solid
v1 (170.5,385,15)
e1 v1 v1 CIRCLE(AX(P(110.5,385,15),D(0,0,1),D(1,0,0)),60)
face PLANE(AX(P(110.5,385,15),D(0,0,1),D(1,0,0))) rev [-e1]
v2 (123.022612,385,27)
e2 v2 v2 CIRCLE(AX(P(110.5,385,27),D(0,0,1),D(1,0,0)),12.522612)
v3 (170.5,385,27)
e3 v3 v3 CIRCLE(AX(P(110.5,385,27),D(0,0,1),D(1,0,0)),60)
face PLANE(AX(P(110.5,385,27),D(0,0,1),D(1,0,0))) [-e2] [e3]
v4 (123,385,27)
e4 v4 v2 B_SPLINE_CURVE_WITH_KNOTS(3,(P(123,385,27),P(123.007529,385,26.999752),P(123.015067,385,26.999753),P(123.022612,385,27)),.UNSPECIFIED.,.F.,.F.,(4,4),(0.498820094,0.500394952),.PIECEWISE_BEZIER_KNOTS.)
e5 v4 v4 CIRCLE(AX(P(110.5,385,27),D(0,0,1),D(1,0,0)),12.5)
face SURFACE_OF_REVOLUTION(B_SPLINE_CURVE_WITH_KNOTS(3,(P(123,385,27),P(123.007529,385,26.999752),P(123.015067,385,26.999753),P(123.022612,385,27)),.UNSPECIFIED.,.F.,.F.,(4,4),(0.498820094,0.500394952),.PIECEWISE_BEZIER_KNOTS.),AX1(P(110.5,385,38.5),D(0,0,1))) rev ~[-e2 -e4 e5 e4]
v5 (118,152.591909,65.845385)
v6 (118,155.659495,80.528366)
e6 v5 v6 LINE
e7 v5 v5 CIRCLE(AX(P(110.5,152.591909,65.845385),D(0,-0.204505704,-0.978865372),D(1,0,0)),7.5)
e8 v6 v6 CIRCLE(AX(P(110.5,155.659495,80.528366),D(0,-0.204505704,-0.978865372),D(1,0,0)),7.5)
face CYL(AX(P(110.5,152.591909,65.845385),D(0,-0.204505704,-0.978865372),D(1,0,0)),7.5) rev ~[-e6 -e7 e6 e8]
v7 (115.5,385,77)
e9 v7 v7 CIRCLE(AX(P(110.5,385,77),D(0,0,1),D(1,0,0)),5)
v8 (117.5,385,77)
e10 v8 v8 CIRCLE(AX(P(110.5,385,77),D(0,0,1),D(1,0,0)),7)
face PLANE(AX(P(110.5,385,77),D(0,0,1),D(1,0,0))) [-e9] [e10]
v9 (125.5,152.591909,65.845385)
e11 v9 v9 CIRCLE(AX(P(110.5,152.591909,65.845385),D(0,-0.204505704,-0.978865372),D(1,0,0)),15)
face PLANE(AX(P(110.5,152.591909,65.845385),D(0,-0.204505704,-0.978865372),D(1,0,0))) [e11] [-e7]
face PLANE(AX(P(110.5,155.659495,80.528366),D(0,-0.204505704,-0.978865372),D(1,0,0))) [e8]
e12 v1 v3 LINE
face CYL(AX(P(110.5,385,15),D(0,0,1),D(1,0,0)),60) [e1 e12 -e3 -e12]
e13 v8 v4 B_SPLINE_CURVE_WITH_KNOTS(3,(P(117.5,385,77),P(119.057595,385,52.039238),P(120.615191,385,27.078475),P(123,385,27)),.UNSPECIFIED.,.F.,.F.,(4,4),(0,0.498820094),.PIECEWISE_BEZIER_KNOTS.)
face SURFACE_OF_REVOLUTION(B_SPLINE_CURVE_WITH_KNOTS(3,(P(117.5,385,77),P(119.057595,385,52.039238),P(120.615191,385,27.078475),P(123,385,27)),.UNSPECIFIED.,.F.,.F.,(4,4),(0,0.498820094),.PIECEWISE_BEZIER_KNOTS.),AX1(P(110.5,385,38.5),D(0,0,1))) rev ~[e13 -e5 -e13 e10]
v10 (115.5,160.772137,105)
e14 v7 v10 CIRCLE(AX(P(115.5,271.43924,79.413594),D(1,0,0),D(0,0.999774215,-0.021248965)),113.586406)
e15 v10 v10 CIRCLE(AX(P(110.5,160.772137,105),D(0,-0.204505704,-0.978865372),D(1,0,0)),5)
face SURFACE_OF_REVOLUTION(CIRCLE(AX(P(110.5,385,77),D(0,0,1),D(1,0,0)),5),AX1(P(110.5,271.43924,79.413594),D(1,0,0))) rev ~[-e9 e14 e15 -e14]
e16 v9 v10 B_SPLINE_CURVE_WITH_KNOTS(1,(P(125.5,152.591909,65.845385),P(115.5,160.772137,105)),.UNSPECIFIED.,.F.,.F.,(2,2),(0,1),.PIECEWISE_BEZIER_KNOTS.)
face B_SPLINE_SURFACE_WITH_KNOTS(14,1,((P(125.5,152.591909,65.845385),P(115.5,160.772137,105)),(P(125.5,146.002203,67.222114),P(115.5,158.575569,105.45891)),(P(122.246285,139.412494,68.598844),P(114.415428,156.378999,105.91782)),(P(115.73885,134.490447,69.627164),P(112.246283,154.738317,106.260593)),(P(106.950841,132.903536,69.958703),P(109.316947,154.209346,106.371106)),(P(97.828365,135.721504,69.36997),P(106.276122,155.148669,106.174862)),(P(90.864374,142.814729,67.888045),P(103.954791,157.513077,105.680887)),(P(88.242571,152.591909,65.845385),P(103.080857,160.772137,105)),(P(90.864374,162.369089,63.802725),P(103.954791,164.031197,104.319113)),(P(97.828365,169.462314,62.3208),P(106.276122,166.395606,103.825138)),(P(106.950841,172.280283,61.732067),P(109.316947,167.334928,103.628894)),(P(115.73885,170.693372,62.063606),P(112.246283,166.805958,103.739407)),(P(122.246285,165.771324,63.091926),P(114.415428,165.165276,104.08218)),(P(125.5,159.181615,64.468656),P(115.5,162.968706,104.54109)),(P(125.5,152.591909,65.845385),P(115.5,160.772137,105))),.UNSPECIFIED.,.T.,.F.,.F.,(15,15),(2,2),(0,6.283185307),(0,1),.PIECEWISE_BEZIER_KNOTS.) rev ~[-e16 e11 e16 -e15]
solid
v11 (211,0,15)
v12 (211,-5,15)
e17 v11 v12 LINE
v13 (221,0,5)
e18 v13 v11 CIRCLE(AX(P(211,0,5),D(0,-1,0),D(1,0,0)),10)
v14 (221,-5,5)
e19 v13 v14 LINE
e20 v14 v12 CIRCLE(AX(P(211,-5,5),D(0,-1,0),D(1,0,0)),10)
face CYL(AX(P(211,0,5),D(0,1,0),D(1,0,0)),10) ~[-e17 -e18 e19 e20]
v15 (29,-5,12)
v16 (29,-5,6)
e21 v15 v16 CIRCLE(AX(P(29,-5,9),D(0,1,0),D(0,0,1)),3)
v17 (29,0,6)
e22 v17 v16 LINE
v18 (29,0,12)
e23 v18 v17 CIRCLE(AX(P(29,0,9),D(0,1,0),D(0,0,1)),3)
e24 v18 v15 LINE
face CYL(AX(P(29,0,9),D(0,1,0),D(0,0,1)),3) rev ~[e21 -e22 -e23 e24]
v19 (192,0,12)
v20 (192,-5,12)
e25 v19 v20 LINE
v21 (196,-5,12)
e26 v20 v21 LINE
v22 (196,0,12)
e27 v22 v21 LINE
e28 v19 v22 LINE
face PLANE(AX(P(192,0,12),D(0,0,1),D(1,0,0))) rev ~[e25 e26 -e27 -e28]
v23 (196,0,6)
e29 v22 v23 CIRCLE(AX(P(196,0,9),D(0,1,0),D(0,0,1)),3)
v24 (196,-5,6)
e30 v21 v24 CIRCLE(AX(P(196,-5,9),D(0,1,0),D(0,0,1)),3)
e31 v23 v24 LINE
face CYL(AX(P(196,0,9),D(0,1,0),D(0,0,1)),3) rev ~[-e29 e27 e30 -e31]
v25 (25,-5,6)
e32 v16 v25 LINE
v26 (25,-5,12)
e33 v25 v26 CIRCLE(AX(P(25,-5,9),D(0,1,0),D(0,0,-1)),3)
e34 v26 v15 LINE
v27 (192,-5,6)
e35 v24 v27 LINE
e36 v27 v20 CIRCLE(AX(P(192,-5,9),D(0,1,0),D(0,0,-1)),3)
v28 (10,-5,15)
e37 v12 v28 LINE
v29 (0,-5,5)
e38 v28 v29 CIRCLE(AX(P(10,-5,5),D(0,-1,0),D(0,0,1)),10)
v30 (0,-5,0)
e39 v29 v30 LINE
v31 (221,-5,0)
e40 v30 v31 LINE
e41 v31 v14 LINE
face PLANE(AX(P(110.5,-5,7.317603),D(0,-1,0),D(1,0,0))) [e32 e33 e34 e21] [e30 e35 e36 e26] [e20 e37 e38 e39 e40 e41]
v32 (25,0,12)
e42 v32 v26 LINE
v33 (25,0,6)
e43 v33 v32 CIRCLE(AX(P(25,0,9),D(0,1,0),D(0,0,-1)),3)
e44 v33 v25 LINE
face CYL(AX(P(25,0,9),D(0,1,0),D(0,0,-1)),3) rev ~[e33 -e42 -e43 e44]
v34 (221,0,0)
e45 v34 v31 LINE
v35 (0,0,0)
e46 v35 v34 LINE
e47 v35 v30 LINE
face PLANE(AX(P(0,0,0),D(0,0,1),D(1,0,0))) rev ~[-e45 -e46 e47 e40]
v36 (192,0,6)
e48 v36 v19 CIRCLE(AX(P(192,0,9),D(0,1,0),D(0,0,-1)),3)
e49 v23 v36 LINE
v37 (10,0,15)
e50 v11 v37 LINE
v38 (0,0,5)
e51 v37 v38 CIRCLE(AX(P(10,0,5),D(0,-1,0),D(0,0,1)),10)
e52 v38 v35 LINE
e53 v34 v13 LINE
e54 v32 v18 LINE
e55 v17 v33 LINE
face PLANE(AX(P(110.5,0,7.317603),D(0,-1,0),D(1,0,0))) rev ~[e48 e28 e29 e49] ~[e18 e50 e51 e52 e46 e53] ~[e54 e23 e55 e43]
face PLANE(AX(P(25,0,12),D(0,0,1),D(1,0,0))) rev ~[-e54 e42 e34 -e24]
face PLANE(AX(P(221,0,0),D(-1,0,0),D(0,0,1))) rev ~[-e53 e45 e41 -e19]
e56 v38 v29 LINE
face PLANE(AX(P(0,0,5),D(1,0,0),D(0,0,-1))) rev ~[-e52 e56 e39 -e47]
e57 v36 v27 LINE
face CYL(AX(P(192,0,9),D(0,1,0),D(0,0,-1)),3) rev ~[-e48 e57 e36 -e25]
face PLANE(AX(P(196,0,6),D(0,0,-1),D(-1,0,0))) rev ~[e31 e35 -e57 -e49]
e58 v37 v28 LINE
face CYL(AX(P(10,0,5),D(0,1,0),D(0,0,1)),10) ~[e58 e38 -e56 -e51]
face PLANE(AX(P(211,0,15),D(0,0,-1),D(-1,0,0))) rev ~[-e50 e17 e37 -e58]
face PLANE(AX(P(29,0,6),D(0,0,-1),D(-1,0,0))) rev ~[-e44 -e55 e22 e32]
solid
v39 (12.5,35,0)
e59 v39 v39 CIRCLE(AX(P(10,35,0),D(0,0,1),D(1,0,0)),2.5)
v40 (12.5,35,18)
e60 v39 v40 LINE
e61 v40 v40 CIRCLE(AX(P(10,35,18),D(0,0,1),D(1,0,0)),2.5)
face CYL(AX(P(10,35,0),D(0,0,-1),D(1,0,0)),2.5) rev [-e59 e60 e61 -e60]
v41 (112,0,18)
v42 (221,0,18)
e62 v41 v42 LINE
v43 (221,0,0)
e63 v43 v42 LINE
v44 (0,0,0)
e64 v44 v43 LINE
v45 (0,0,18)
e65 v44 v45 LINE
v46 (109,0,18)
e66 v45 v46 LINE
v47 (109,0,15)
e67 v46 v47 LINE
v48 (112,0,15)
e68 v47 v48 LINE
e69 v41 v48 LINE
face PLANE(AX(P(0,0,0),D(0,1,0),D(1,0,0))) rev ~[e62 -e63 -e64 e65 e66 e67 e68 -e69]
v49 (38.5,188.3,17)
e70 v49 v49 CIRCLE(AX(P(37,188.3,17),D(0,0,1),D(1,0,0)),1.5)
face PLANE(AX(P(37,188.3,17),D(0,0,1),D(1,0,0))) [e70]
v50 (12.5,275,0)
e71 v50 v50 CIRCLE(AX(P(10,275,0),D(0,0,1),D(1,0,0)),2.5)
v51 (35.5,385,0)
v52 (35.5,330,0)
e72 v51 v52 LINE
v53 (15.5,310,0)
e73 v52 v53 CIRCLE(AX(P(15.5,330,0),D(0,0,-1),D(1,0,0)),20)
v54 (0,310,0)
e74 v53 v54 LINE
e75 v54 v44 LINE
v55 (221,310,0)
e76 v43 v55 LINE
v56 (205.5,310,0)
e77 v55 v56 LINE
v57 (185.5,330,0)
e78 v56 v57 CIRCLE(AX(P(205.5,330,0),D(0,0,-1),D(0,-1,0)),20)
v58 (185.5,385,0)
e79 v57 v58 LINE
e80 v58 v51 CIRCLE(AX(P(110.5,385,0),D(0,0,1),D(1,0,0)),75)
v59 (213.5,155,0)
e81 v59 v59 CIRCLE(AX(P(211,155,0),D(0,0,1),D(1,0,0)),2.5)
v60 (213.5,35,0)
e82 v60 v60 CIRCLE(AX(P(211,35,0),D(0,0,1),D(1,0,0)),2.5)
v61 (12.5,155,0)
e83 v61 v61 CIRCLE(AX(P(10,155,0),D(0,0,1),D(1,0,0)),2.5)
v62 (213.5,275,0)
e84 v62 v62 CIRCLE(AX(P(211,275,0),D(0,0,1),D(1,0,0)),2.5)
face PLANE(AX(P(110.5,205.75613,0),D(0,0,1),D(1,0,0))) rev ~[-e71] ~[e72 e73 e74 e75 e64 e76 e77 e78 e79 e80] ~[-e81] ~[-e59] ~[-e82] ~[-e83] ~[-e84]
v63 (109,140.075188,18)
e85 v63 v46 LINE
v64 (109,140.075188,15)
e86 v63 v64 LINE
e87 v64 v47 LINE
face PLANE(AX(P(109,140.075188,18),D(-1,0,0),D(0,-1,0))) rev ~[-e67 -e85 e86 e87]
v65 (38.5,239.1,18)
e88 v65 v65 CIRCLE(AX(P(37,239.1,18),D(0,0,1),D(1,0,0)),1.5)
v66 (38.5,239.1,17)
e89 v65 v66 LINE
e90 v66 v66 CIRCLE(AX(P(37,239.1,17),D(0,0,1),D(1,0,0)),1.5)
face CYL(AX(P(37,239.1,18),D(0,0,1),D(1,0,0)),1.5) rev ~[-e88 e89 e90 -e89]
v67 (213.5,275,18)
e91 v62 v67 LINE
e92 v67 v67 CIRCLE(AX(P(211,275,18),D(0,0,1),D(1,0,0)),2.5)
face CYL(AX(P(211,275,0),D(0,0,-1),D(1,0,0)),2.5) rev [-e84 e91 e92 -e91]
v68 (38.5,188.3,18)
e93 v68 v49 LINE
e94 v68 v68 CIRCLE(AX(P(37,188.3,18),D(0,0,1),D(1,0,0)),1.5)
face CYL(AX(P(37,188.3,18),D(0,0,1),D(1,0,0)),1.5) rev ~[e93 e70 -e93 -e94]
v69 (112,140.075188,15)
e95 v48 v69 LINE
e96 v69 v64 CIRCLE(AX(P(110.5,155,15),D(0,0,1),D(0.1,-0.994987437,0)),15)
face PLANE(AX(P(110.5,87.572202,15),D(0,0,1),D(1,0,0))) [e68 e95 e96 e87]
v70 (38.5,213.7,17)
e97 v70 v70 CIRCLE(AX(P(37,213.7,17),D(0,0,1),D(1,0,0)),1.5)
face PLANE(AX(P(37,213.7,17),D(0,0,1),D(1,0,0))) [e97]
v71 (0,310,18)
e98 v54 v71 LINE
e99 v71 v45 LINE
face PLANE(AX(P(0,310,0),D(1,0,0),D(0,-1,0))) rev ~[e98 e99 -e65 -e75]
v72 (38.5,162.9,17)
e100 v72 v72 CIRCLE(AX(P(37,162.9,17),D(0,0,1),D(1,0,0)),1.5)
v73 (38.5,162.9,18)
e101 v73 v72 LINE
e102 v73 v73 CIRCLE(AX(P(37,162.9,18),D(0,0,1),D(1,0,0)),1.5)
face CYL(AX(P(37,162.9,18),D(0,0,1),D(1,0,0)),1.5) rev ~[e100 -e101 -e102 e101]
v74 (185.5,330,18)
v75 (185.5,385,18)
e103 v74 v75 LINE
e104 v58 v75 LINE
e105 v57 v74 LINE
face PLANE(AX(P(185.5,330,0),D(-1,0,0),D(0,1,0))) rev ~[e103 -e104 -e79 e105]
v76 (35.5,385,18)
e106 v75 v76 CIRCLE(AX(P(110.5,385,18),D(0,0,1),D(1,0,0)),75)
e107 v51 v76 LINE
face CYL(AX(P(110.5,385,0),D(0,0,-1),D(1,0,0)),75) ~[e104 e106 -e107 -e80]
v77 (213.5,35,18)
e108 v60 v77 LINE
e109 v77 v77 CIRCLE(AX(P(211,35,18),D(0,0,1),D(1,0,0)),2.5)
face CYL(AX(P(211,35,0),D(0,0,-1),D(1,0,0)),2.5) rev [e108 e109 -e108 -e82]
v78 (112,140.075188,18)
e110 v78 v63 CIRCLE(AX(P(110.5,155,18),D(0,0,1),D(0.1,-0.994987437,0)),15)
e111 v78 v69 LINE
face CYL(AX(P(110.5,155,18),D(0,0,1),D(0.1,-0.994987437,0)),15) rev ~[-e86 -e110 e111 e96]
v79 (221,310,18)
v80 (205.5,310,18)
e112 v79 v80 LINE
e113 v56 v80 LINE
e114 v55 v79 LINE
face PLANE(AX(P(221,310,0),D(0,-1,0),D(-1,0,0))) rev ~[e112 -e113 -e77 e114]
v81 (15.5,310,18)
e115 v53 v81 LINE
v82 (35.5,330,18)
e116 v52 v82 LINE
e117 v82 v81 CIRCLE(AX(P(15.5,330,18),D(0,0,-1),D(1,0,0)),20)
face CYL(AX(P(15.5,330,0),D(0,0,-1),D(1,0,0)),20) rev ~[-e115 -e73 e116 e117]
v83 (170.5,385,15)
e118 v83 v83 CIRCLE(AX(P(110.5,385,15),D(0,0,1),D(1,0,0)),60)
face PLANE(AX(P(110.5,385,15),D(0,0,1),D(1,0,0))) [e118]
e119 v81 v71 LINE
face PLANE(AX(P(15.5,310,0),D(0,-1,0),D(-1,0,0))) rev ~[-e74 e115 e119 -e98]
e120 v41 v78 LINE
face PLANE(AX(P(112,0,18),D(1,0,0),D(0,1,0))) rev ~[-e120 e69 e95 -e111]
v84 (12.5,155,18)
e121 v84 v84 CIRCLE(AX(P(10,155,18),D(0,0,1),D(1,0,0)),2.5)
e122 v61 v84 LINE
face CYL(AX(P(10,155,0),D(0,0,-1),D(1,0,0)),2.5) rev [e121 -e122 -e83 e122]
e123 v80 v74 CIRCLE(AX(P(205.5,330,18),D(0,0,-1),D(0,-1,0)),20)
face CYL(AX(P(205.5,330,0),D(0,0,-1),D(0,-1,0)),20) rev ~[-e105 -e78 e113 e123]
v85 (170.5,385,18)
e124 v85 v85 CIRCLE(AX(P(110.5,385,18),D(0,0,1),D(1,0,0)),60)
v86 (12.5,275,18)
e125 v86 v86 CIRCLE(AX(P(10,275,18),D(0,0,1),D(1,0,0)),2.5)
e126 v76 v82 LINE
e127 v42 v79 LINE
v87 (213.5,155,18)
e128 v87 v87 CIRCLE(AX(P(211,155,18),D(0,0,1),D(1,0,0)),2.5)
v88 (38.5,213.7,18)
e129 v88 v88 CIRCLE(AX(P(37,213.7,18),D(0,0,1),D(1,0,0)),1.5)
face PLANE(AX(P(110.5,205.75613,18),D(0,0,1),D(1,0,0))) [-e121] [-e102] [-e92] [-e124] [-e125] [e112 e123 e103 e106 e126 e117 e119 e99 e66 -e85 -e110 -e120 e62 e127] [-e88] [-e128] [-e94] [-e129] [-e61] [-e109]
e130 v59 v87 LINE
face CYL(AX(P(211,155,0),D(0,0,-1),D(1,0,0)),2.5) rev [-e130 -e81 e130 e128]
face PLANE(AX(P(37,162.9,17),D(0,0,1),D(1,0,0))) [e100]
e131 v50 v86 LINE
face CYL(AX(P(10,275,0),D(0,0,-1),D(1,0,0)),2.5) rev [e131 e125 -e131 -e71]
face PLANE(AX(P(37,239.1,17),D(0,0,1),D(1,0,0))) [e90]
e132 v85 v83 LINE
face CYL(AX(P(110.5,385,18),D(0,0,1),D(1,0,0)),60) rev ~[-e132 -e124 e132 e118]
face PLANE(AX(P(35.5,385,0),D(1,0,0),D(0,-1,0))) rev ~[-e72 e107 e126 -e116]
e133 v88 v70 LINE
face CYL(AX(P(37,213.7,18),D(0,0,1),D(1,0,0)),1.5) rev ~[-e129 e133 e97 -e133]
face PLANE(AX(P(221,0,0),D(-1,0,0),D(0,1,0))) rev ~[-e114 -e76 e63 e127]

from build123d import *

# Parameters (mm, degrees)
F0_R       = 2.5
F1_DEPTH   = 18
F2_R       = 1.5
F3_DEPTH   = 1
F2_R_2     = 60
F4_DEPTH   = 3
F6_DEPTH   = 5
F10_R      = 5
F15_R      = 15
F13_FACE_R = 5
F17_R      = 7.5
F18_DEPTH  = 15


# Not quite as in the source:
# - a feature names something its author has since deleted; it is built from what else it names


with BuildPart() as f1:
    # F0 (on Top) → F1 (new body)
    with BuildSketch(Plane.XY):
        with BuildLine():
            Line((0, 310), (0, 0))
            Line((0, 0), (221, 0))
            Line((221, 0), (221, 310))
            Line((221, 310), (205.5, 310))
            ThreePointArc((205.5, 310), (191.3578643763, 315.8578643763), (185.5, 330))
            Line((185.5, 330), (185.5, 385))
            ThreePointArc((185.5, 385), (110.5, 460), (35.5, 385))
            Line((35.5, 385), (35.5, 330))
            ThreePointArc((35.5, 330), (29.6421356237, 315.8578643763), (15.5, 310))
            Line((15.5, 310), (0, 310))
        make_face()
        with Locations((10, 35)):
            Circle(F0_R, mode=Mode.SUBTRACT)
        with Locations((10, 155)):
            Circle(F0_R, mode=Mode.SUBTRACT)
        with Locations((211, 35)):
            Circle(F0_R, mode=Mode.SUBTRACT)
        with Locations((211, 155)):
            Circle(F0_R, mode=Mode.SUBTRACT)
        with Locations((10, 275)):
            Circle(F0_R, mode=Mode.SUBTRACT)
        with Locations((211, 275)):
            Circle(F0_R, mode=Mode.SUBTRACT)
    extrude(amount=F1_DEPTH)

    # F2 (on face) → F3 (cut)
    with BuildSketch(Plane.XY.offset(18)):
        with Locations((37, 162.9)):
            Circle(F2_R)
        with Locations((37, 188.3)):
            Circle(F2_R)
        with Locations((37, 213.7)):
            Circle(F2_R)
        with Locations((37, 239.1)):
            Circle(F2_R)
    extrude(amount=-F3_DEPTH, mode=Mode.SUBTRACT)

    # F2 (on face) → F4 (cut)
    with BuildSketch(Plane.XY.offset(18)):
        with BuildLine():
            Line((112, 0), (112, 140.0751884434))
            ThreePointArc((112, 140.0751884434), (110.5, 170), (109, 140.0751884434))
            Line((109, 140.0751884434), (109, 0))
            Line((109, 0), (112, 0))
        make_face()
        with Locations((110.5, 385)):
            Circle(F2_R_2)
    extrude(amount=-F4_DEPTH, mode=Mode.SUBTRACT)


with BuildPart() as f6:
    # F5 (on Front) → F6 (new body)
    with BuildSketch(Plane.XZ):
        with BuildLine():
            Line((211, 15), (10, 15))
            ThreePointArc((10, 15), (2.9289321881, 12.0710678119), (0, 5))
            Line((0, 5), (0, 0))
            Line((0, 0), (221, 0))
            Line((221, 0), (221, 5))
            ThreePointArc((221, 5), (218.0710678119, 12.0710678119), (211, 15))
        make_face()
        with BuildLine():
            ThreePointArc((25, 6), (22, 9), (25, 12))
            Line((25, 12), (29, 12))
            ThreePointArc((29, 12), (32, 9), (29, 6))
            Line((29, 6), (25, 6))
        make_face(mode=Mode.SUBTRACT)
        with BuildLine():
            Line((192, 12), (196, 12))
            ThreePointArc((196, 12), (199, 9), (196, 6))
            Line((196, 6), (192, 6))
            ThreePointArc((192, 6), (189, 9), (192, 12))
        make_face(mode=Mode.SUBTRACT)
    extrude(amount=F6_DEPTH)


with BuildPart() as f9:
    # F8 (on offset) → F9 (revolve)
    with BuildSketch(Plane.XZ.offset(-385)):
        with BuildLine():
            Line((110.5, 77), (110.5, 15))
            Line((110.5, 15), (170.5, 15))
            Line((170.5, 15), (170.5, 27))
            Line((170.5, 27), (123.0226124214, 27))
            add(Edge.make_bspline(
                [(123, 27), (123.007529237, 26.9997522408), (123.0150667195, 26.9997525006), (123.0226124214, 27)],
                knots=[0.4988200942, 0.4988200942, 0.4988200942, 0.4988200942, 0.5003949515, 0.5003949515, 0.5003949515, 0.5003949515], degree=3))
            add(Edge.make_bspline(
                [(117.5, 77), (119.0575952544, 52.0392376011), (120.6151905087, 27.0784752021), (123, 27)],
                knots=[0, 0, 0, 0, 0.4988200942, 0.4988200942, 0.4988200942, 0.4988200942], degree=3))
            Line((117.5, 77), (110.5, 77))
        make_face()
    revolve(axis=Axis((110.5, 385, 38.5), (0, 0, 1)))

    # F13: sweep along a path in F12
    with BuildLine(Plane.YZ.offset(110.5)) as f13_path:
        ThreePointArc((385, 77), (285.5138023174, 192.1246330091), (160.772137354, 105))
    # F10 (on face) → F13 (sweep)
    with BuildSketch(Plane.XY.offset(77)):
        with Locations((110.5, 385)):
            Circle(F10_R)
    sweep(path=f13_path.line)

    # F15 (on offset) → F16 section 0
    with BuildSketch(Plane(origin=(0, 19.562950875, 93.6379514405), x_dir=(1, 0, 0), z_dir=(0, -0.2045057041, -0.9788653722))):
        with Locations((110.5, -135.9011791469)):
            Circle(F15_R)
    # F13_face (on face) → F16 section 1
    with BuildSketch(Plane(origin=(110.5, 160.772137354, 105), x_dir=(1, 0, 0), z_dir=(0, -0.2045057041, -0.9788653722))):
        Circle(F13_FACE_R)
    loft()

    # F17 (on face) → F18 (cut)
    with BuildSketch(Plane(origin=(0, 19.562950875, 93.6379514405), x_dir=(1, 0, 0), z_dir=(0, -0.2045057041, -0.9788653722))):
        with Locations((110.5, -135.9011791469)):
            Circle(F17_R)
    extrude(amount=-F18_DEPTH, mode=Mode.SUBTRACT)


solid = Compound([f1.part, f6.part, f9.part])
